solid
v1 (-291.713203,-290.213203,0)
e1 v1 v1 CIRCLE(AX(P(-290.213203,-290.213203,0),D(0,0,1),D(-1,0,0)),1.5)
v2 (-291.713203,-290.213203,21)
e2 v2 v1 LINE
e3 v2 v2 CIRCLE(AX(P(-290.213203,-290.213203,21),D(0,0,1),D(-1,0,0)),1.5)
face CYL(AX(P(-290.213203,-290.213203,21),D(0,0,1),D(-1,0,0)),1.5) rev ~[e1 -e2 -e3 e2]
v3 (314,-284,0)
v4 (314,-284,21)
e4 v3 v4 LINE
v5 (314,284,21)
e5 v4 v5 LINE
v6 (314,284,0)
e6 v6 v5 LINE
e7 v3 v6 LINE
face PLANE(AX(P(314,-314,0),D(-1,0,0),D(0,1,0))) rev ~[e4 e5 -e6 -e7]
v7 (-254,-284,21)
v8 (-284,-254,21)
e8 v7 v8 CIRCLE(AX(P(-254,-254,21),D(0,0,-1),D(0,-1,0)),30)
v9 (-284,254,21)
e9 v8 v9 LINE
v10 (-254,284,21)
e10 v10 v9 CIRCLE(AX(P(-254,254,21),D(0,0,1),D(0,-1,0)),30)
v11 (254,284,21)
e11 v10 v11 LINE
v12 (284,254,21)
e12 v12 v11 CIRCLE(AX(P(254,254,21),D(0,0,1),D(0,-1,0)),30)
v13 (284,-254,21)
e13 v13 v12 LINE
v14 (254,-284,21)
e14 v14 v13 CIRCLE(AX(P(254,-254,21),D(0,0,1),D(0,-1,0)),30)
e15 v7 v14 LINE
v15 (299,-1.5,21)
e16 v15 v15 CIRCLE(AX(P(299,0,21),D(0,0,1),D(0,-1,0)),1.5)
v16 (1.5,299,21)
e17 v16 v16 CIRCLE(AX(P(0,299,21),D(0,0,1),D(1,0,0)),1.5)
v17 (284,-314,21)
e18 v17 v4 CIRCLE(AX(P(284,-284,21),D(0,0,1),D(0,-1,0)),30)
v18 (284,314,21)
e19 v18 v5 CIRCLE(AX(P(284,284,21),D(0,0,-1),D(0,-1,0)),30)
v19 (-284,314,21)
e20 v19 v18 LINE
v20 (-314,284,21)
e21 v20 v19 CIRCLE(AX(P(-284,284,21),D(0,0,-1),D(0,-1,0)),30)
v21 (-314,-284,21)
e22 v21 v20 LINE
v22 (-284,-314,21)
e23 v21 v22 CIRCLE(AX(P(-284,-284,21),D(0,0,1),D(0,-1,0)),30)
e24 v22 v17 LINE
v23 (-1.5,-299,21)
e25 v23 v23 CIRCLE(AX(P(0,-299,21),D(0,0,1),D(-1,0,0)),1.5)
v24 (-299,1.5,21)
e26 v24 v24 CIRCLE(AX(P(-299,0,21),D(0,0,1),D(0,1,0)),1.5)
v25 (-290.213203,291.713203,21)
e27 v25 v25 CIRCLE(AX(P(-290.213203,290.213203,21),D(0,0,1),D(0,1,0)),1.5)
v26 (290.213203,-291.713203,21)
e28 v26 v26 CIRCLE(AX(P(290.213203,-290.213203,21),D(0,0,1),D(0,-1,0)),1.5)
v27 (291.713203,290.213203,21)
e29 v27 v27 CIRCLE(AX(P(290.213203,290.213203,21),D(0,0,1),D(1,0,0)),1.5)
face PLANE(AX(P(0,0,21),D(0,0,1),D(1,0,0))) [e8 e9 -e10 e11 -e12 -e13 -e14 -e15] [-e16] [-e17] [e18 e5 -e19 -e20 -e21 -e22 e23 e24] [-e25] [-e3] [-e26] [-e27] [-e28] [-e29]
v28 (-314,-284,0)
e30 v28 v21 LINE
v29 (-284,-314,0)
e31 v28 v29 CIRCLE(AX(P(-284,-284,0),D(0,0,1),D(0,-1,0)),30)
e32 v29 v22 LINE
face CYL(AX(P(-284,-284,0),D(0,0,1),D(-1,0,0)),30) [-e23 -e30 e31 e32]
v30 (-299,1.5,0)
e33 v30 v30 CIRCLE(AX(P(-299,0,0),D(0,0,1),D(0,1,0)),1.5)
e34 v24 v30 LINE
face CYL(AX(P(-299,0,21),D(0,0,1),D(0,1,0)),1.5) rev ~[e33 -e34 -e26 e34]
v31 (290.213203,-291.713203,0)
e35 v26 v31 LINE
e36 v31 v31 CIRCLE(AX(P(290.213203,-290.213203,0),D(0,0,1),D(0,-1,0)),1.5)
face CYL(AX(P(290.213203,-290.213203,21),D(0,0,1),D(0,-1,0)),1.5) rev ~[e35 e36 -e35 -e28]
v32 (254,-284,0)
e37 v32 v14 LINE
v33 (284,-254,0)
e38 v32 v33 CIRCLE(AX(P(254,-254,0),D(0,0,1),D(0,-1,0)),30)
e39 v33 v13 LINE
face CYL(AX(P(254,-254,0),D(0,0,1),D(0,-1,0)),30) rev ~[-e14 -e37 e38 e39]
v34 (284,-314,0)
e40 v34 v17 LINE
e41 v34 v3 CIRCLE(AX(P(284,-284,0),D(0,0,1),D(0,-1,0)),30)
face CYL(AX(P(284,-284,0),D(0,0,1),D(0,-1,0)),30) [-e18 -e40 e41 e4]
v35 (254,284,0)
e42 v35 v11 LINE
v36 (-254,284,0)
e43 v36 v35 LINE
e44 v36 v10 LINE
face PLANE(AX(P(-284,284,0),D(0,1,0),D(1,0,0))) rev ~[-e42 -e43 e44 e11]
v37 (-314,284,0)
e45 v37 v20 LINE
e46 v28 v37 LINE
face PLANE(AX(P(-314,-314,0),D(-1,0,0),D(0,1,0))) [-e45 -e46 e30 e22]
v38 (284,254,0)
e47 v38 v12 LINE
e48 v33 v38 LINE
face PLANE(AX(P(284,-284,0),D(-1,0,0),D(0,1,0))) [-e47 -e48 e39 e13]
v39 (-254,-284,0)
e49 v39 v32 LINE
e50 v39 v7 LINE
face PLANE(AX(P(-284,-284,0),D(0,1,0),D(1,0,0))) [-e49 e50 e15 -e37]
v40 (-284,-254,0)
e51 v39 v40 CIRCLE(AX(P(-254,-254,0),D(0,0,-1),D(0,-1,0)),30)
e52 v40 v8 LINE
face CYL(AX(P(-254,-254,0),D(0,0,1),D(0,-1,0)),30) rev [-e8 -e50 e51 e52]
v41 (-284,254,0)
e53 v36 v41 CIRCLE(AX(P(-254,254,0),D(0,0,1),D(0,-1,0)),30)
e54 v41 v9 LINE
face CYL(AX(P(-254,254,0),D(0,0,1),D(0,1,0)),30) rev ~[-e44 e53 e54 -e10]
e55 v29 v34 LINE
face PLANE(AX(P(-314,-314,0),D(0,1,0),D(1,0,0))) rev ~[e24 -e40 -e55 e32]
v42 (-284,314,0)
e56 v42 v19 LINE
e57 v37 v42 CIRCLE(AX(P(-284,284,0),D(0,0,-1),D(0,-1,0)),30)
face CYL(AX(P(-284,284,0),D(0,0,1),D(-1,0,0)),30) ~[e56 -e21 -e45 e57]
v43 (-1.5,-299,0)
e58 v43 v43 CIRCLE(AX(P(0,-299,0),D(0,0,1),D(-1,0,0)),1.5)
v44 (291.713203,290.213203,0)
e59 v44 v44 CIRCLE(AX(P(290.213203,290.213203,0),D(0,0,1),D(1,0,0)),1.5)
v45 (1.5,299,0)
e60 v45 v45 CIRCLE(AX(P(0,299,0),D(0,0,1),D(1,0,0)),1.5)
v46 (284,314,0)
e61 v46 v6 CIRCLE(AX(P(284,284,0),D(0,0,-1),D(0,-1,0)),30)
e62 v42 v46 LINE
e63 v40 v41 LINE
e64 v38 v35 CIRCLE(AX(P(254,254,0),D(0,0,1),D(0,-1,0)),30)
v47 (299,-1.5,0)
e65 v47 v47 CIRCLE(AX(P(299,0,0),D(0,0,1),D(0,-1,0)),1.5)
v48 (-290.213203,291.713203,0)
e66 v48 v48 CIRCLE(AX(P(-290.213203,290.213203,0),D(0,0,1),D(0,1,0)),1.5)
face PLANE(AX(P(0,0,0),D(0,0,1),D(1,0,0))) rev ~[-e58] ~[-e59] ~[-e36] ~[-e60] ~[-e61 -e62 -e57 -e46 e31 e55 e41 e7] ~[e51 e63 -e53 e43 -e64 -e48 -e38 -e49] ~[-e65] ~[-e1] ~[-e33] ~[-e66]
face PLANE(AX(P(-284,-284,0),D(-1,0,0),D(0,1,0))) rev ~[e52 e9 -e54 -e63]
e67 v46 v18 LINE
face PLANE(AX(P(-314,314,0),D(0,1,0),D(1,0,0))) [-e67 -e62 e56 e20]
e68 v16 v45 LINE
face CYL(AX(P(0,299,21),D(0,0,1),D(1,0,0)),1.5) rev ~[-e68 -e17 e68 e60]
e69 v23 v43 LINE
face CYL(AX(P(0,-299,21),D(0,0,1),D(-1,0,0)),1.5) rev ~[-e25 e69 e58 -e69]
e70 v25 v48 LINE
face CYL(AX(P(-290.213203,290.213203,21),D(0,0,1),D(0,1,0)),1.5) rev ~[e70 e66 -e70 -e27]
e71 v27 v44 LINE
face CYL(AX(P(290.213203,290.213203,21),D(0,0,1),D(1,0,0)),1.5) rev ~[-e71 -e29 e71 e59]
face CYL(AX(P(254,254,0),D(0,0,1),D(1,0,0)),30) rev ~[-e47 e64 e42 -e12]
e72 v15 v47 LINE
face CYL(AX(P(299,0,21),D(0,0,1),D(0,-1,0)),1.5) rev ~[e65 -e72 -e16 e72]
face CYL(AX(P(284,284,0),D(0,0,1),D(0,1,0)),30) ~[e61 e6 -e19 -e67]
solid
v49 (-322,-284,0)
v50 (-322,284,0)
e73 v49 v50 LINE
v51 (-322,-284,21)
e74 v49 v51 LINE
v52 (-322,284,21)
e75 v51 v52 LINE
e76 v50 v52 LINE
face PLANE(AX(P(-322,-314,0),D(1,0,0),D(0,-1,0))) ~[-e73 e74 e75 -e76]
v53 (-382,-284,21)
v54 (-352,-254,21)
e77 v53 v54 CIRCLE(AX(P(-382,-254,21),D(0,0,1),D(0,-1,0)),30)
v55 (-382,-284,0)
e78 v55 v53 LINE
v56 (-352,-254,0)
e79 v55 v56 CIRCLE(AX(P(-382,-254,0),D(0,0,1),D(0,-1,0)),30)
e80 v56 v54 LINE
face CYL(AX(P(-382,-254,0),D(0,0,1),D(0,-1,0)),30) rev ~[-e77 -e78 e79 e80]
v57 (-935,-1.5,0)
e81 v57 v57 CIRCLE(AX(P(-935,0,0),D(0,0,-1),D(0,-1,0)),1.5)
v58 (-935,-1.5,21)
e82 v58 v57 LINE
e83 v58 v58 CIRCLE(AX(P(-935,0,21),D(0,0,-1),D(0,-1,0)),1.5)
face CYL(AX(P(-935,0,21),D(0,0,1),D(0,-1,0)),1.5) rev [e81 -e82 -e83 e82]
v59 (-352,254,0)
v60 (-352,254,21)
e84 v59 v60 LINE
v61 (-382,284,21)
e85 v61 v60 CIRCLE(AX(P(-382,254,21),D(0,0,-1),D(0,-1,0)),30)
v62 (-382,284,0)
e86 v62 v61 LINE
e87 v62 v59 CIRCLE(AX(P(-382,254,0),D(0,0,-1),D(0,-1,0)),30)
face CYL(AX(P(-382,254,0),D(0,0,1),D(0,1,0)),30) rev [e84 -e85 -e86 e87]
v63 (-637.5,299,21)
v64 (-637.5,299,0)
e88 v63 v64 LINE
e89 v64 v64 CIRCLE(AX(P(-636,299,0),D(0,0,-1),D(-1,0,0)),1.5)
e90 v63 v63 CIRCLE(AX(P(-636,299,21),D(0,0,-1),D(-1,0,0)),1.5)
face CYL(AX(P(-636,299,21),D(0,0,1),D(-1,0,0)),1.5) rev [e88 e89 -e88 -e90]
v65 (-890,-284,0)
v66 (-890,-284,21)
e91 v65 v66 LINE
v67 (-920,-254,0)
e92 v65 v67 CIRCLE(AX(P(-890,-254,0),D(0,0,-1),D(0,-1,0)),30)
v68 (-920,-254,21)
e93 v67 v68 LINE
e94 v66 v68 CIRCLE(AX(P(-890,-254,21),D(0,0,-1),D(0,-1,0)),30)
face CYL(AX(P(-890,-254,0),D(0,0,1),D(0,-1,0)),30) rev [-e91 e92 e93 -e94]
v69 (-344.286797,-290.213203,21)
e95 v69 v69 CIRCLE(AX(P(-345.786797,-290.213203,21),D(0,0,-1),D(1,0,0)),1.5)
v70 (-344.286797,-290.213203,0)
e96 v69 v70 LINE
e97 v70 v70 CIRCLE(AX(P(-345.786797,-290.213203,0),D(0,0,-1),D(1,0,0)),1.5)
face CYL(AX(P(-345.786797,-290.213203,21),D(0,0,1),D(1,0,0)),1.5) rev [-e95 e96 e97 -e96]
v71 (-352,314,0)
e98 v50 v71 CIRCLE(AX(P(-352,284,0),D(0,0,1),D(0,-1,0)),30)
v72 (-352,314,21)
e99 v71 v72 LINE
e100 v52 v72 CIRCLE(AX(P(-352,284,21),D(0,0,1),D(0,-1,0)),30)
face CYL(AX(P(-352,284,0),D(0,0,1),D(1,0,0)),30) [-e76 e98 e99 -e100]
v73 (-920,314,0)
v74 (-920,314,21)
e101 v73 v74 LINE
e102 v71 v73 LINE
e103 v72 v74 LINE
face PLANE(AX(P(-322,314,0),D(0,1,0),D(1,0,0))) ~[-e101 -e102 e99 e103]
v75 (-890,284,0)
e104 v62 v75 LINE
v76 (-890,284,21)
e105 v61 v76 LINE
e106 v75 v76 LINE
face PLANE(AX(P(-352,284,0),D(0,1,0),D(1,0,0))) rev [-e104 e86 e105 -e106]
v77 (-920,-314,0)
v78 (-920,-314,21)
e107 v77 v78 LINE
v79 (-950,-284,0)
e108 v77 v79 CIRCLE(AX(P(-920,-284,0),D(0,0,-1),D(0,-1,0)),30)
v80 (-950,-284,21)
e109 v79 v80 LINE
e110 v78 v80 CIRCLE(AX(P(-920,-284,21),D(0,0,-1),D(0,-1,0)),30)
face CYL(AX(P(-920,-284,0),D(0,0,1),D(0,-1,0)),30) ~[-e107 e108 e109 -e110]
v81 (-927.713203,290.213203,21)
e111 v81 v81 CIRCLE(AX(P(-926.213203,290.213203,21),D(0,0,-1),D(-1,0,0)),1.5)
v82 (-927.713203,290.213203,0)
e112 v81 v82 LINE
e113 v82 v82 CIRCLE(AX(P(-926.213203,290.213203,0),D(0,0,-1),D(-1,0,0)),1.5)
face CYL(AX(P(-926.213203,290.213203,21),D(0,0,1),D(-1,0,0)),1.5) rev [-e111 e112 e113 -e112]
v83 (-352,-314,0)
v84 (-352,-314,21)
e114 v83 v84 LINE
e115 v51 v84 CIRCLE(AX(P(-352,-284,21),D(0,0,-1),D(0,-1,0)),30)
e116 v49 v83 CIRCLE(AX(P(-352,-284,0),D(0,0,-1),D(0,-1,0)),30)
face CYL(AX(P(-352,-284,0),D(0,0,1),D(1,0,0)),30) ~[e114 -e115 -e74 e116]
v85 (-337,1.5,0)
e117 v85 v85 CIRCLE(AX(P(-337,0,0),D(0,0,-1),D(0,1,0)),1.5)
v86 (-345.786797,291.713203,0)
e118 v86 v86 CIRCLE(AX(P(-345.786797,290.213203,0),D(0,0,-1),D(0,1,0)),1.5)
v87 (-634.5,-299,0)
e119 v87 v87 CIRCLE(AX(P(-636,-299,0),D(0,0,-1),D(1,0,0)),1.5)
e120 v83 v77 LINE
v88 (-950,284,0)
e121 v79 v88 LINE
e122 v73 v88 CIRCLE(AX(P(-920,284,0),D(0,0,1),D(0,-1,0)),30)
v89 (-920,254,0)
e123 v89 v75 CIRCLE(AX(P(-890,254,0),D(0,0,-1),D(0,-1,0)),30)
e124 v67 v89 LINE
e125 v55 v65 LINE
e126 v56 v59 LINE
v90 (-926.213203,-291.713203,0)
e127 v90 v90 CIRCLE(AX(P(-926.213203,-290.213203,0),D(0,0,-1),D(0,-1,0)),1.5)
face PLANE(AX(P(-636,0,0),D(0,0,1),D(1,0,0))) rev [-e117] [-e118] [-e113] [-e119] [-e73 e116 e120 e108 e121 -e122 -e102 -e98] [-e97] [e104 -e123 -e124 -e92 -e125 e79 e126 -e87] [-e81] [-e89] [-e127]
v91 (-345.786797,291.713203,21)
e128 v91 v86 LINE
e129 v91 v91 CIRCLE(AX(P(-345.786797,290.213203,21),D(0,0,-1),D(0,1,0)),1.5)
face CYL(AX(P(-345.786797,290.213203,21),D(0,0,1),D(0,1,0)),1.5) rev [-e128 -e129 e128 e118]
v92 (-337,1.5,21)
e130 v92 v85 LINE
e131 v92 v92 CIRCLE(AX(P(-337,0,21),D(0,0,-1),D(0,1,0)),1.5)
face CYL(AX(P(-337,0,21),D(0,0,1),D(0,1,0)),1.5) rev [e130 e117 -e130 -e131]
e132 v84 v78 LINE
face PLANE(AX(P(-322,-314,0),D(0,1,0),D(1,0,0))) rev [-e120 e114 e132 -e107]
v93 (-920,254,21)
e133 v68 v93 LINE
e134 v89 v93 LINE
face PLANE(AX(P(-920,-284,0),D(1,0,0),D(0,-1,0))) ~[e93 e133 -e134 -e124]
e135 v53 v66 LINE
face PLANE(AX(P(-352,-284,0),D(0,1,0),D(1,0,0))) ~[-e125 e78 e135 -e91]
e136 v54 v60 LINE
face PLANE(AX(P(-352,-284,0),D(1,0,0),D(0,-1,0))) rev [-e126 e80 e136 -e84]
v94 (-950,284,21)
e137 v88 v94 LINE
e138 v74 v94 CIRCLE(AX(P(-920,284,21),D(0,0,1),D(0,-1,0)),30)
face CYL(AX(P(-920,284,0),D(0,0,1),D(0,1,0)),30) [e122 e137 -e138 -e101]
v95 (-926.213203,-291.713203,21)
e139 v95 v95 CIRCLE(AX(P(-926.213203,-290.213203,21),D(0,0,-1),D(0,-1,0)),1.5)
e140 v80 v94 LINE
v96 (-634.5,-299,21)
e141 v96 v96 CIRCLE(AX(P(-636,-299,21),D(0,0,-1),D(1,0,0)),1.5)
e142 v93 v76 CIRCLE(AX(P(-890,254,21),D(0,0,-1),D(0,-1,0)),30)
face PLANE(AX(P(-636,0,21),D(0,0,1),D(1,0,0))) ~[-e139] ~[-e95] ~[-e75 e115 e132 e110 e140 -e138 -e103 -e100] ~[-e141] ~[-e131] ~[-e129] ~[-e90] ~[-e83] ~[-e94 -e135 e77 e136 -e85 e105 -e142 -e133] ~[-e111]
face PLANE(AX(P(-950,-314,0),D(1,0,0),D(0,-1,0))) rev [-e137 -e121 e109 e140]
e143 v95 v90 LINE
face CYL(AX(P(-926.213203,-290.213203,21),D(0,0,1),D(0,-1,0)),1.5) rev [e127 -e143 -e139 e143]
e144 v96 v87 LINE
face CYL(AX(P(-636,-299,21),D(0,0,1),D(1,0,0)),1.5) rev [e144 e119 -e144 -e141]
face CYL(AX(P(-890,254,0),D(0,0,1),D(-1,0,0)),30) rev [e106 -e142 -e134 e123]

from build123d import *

# Parameters (mm, degrees)
F0_W            = 628
F0_H            = 628
F0_W_2          = 568
F0_H_2          = 568
F1_DEPTH        = 21
F2_R            = 30
F3_R            = 30
F6_R            = 1.5
F7_DEPTH        = 21.001
F7_COPIES_COUNT = 4


# Not quite as in the source:
# - a pattern or mirror of a feature is missing from the dataset's text; its kind, count and spacing are read off the source's solid


with BuildPart() as f1:
    # F0 (on Top) → F1 (new body)
    with BuildSketch(Plane.XY):
        Rectangle(F0_W, F0_H)
        Rectangle(F0_W_2, F0_H_2, mode=Mode.SUBTRACT)
    extrude(amount=F1_DEPTH)

    # F2
    f2_edges = [f1.edges().sort_by_distance(p)[0] for p in [
        (-284, 284, 10.5),
        (284, 284, 10.5),
        (284, -284, 10.5),
        (-284, -284, 10.5),
    ]]
    fillet(f2_edges, radius=F2_R)

    # F3
    f3_edges = [f1.edges().sort_by_distance(p)[0] for p in [
        (-314, -314, 10.5),
        (314, -314, 10.5),
        (314, 314, 10.5),
        (-314, 314, 10.5),
    ]]
    fillet(f3_edges, radius=F3_R)

    # F6 (on face) → F7 (cut, through all)
    with BuildSketch(Plane.XY.offset(21)):
        with Locations((0, 299)):
            Circle(F6_R)
        with Locations((290.2132034356, 290.2132034356)):
            Circle(F6_R)
    f7 = extrude(amount=-F7_DEPTH, mode=Mode.SUBTRACT)

    # F7_copies: F7 ×4 about axis
    f7_copies_axis = Axis((0, 0, 0), (0, 0, 1))
    for i in range(1, F7_COPIES_COUNT):
        add(f7.rotate(f7_copies_axis, i * 360 / F7_COPIES_COUNT), mode=Mode.SUBTRACT)


with BuildPart() as f8_1:
    # F8: instance of F1
    add(f1.part.mirror(Plane(origin=(-318, 0, 10.5), x_dir=(0, -1, 0), z_dir=(-1, 0, 0))))


solid = Compound([f1.part, f8_1.part])
